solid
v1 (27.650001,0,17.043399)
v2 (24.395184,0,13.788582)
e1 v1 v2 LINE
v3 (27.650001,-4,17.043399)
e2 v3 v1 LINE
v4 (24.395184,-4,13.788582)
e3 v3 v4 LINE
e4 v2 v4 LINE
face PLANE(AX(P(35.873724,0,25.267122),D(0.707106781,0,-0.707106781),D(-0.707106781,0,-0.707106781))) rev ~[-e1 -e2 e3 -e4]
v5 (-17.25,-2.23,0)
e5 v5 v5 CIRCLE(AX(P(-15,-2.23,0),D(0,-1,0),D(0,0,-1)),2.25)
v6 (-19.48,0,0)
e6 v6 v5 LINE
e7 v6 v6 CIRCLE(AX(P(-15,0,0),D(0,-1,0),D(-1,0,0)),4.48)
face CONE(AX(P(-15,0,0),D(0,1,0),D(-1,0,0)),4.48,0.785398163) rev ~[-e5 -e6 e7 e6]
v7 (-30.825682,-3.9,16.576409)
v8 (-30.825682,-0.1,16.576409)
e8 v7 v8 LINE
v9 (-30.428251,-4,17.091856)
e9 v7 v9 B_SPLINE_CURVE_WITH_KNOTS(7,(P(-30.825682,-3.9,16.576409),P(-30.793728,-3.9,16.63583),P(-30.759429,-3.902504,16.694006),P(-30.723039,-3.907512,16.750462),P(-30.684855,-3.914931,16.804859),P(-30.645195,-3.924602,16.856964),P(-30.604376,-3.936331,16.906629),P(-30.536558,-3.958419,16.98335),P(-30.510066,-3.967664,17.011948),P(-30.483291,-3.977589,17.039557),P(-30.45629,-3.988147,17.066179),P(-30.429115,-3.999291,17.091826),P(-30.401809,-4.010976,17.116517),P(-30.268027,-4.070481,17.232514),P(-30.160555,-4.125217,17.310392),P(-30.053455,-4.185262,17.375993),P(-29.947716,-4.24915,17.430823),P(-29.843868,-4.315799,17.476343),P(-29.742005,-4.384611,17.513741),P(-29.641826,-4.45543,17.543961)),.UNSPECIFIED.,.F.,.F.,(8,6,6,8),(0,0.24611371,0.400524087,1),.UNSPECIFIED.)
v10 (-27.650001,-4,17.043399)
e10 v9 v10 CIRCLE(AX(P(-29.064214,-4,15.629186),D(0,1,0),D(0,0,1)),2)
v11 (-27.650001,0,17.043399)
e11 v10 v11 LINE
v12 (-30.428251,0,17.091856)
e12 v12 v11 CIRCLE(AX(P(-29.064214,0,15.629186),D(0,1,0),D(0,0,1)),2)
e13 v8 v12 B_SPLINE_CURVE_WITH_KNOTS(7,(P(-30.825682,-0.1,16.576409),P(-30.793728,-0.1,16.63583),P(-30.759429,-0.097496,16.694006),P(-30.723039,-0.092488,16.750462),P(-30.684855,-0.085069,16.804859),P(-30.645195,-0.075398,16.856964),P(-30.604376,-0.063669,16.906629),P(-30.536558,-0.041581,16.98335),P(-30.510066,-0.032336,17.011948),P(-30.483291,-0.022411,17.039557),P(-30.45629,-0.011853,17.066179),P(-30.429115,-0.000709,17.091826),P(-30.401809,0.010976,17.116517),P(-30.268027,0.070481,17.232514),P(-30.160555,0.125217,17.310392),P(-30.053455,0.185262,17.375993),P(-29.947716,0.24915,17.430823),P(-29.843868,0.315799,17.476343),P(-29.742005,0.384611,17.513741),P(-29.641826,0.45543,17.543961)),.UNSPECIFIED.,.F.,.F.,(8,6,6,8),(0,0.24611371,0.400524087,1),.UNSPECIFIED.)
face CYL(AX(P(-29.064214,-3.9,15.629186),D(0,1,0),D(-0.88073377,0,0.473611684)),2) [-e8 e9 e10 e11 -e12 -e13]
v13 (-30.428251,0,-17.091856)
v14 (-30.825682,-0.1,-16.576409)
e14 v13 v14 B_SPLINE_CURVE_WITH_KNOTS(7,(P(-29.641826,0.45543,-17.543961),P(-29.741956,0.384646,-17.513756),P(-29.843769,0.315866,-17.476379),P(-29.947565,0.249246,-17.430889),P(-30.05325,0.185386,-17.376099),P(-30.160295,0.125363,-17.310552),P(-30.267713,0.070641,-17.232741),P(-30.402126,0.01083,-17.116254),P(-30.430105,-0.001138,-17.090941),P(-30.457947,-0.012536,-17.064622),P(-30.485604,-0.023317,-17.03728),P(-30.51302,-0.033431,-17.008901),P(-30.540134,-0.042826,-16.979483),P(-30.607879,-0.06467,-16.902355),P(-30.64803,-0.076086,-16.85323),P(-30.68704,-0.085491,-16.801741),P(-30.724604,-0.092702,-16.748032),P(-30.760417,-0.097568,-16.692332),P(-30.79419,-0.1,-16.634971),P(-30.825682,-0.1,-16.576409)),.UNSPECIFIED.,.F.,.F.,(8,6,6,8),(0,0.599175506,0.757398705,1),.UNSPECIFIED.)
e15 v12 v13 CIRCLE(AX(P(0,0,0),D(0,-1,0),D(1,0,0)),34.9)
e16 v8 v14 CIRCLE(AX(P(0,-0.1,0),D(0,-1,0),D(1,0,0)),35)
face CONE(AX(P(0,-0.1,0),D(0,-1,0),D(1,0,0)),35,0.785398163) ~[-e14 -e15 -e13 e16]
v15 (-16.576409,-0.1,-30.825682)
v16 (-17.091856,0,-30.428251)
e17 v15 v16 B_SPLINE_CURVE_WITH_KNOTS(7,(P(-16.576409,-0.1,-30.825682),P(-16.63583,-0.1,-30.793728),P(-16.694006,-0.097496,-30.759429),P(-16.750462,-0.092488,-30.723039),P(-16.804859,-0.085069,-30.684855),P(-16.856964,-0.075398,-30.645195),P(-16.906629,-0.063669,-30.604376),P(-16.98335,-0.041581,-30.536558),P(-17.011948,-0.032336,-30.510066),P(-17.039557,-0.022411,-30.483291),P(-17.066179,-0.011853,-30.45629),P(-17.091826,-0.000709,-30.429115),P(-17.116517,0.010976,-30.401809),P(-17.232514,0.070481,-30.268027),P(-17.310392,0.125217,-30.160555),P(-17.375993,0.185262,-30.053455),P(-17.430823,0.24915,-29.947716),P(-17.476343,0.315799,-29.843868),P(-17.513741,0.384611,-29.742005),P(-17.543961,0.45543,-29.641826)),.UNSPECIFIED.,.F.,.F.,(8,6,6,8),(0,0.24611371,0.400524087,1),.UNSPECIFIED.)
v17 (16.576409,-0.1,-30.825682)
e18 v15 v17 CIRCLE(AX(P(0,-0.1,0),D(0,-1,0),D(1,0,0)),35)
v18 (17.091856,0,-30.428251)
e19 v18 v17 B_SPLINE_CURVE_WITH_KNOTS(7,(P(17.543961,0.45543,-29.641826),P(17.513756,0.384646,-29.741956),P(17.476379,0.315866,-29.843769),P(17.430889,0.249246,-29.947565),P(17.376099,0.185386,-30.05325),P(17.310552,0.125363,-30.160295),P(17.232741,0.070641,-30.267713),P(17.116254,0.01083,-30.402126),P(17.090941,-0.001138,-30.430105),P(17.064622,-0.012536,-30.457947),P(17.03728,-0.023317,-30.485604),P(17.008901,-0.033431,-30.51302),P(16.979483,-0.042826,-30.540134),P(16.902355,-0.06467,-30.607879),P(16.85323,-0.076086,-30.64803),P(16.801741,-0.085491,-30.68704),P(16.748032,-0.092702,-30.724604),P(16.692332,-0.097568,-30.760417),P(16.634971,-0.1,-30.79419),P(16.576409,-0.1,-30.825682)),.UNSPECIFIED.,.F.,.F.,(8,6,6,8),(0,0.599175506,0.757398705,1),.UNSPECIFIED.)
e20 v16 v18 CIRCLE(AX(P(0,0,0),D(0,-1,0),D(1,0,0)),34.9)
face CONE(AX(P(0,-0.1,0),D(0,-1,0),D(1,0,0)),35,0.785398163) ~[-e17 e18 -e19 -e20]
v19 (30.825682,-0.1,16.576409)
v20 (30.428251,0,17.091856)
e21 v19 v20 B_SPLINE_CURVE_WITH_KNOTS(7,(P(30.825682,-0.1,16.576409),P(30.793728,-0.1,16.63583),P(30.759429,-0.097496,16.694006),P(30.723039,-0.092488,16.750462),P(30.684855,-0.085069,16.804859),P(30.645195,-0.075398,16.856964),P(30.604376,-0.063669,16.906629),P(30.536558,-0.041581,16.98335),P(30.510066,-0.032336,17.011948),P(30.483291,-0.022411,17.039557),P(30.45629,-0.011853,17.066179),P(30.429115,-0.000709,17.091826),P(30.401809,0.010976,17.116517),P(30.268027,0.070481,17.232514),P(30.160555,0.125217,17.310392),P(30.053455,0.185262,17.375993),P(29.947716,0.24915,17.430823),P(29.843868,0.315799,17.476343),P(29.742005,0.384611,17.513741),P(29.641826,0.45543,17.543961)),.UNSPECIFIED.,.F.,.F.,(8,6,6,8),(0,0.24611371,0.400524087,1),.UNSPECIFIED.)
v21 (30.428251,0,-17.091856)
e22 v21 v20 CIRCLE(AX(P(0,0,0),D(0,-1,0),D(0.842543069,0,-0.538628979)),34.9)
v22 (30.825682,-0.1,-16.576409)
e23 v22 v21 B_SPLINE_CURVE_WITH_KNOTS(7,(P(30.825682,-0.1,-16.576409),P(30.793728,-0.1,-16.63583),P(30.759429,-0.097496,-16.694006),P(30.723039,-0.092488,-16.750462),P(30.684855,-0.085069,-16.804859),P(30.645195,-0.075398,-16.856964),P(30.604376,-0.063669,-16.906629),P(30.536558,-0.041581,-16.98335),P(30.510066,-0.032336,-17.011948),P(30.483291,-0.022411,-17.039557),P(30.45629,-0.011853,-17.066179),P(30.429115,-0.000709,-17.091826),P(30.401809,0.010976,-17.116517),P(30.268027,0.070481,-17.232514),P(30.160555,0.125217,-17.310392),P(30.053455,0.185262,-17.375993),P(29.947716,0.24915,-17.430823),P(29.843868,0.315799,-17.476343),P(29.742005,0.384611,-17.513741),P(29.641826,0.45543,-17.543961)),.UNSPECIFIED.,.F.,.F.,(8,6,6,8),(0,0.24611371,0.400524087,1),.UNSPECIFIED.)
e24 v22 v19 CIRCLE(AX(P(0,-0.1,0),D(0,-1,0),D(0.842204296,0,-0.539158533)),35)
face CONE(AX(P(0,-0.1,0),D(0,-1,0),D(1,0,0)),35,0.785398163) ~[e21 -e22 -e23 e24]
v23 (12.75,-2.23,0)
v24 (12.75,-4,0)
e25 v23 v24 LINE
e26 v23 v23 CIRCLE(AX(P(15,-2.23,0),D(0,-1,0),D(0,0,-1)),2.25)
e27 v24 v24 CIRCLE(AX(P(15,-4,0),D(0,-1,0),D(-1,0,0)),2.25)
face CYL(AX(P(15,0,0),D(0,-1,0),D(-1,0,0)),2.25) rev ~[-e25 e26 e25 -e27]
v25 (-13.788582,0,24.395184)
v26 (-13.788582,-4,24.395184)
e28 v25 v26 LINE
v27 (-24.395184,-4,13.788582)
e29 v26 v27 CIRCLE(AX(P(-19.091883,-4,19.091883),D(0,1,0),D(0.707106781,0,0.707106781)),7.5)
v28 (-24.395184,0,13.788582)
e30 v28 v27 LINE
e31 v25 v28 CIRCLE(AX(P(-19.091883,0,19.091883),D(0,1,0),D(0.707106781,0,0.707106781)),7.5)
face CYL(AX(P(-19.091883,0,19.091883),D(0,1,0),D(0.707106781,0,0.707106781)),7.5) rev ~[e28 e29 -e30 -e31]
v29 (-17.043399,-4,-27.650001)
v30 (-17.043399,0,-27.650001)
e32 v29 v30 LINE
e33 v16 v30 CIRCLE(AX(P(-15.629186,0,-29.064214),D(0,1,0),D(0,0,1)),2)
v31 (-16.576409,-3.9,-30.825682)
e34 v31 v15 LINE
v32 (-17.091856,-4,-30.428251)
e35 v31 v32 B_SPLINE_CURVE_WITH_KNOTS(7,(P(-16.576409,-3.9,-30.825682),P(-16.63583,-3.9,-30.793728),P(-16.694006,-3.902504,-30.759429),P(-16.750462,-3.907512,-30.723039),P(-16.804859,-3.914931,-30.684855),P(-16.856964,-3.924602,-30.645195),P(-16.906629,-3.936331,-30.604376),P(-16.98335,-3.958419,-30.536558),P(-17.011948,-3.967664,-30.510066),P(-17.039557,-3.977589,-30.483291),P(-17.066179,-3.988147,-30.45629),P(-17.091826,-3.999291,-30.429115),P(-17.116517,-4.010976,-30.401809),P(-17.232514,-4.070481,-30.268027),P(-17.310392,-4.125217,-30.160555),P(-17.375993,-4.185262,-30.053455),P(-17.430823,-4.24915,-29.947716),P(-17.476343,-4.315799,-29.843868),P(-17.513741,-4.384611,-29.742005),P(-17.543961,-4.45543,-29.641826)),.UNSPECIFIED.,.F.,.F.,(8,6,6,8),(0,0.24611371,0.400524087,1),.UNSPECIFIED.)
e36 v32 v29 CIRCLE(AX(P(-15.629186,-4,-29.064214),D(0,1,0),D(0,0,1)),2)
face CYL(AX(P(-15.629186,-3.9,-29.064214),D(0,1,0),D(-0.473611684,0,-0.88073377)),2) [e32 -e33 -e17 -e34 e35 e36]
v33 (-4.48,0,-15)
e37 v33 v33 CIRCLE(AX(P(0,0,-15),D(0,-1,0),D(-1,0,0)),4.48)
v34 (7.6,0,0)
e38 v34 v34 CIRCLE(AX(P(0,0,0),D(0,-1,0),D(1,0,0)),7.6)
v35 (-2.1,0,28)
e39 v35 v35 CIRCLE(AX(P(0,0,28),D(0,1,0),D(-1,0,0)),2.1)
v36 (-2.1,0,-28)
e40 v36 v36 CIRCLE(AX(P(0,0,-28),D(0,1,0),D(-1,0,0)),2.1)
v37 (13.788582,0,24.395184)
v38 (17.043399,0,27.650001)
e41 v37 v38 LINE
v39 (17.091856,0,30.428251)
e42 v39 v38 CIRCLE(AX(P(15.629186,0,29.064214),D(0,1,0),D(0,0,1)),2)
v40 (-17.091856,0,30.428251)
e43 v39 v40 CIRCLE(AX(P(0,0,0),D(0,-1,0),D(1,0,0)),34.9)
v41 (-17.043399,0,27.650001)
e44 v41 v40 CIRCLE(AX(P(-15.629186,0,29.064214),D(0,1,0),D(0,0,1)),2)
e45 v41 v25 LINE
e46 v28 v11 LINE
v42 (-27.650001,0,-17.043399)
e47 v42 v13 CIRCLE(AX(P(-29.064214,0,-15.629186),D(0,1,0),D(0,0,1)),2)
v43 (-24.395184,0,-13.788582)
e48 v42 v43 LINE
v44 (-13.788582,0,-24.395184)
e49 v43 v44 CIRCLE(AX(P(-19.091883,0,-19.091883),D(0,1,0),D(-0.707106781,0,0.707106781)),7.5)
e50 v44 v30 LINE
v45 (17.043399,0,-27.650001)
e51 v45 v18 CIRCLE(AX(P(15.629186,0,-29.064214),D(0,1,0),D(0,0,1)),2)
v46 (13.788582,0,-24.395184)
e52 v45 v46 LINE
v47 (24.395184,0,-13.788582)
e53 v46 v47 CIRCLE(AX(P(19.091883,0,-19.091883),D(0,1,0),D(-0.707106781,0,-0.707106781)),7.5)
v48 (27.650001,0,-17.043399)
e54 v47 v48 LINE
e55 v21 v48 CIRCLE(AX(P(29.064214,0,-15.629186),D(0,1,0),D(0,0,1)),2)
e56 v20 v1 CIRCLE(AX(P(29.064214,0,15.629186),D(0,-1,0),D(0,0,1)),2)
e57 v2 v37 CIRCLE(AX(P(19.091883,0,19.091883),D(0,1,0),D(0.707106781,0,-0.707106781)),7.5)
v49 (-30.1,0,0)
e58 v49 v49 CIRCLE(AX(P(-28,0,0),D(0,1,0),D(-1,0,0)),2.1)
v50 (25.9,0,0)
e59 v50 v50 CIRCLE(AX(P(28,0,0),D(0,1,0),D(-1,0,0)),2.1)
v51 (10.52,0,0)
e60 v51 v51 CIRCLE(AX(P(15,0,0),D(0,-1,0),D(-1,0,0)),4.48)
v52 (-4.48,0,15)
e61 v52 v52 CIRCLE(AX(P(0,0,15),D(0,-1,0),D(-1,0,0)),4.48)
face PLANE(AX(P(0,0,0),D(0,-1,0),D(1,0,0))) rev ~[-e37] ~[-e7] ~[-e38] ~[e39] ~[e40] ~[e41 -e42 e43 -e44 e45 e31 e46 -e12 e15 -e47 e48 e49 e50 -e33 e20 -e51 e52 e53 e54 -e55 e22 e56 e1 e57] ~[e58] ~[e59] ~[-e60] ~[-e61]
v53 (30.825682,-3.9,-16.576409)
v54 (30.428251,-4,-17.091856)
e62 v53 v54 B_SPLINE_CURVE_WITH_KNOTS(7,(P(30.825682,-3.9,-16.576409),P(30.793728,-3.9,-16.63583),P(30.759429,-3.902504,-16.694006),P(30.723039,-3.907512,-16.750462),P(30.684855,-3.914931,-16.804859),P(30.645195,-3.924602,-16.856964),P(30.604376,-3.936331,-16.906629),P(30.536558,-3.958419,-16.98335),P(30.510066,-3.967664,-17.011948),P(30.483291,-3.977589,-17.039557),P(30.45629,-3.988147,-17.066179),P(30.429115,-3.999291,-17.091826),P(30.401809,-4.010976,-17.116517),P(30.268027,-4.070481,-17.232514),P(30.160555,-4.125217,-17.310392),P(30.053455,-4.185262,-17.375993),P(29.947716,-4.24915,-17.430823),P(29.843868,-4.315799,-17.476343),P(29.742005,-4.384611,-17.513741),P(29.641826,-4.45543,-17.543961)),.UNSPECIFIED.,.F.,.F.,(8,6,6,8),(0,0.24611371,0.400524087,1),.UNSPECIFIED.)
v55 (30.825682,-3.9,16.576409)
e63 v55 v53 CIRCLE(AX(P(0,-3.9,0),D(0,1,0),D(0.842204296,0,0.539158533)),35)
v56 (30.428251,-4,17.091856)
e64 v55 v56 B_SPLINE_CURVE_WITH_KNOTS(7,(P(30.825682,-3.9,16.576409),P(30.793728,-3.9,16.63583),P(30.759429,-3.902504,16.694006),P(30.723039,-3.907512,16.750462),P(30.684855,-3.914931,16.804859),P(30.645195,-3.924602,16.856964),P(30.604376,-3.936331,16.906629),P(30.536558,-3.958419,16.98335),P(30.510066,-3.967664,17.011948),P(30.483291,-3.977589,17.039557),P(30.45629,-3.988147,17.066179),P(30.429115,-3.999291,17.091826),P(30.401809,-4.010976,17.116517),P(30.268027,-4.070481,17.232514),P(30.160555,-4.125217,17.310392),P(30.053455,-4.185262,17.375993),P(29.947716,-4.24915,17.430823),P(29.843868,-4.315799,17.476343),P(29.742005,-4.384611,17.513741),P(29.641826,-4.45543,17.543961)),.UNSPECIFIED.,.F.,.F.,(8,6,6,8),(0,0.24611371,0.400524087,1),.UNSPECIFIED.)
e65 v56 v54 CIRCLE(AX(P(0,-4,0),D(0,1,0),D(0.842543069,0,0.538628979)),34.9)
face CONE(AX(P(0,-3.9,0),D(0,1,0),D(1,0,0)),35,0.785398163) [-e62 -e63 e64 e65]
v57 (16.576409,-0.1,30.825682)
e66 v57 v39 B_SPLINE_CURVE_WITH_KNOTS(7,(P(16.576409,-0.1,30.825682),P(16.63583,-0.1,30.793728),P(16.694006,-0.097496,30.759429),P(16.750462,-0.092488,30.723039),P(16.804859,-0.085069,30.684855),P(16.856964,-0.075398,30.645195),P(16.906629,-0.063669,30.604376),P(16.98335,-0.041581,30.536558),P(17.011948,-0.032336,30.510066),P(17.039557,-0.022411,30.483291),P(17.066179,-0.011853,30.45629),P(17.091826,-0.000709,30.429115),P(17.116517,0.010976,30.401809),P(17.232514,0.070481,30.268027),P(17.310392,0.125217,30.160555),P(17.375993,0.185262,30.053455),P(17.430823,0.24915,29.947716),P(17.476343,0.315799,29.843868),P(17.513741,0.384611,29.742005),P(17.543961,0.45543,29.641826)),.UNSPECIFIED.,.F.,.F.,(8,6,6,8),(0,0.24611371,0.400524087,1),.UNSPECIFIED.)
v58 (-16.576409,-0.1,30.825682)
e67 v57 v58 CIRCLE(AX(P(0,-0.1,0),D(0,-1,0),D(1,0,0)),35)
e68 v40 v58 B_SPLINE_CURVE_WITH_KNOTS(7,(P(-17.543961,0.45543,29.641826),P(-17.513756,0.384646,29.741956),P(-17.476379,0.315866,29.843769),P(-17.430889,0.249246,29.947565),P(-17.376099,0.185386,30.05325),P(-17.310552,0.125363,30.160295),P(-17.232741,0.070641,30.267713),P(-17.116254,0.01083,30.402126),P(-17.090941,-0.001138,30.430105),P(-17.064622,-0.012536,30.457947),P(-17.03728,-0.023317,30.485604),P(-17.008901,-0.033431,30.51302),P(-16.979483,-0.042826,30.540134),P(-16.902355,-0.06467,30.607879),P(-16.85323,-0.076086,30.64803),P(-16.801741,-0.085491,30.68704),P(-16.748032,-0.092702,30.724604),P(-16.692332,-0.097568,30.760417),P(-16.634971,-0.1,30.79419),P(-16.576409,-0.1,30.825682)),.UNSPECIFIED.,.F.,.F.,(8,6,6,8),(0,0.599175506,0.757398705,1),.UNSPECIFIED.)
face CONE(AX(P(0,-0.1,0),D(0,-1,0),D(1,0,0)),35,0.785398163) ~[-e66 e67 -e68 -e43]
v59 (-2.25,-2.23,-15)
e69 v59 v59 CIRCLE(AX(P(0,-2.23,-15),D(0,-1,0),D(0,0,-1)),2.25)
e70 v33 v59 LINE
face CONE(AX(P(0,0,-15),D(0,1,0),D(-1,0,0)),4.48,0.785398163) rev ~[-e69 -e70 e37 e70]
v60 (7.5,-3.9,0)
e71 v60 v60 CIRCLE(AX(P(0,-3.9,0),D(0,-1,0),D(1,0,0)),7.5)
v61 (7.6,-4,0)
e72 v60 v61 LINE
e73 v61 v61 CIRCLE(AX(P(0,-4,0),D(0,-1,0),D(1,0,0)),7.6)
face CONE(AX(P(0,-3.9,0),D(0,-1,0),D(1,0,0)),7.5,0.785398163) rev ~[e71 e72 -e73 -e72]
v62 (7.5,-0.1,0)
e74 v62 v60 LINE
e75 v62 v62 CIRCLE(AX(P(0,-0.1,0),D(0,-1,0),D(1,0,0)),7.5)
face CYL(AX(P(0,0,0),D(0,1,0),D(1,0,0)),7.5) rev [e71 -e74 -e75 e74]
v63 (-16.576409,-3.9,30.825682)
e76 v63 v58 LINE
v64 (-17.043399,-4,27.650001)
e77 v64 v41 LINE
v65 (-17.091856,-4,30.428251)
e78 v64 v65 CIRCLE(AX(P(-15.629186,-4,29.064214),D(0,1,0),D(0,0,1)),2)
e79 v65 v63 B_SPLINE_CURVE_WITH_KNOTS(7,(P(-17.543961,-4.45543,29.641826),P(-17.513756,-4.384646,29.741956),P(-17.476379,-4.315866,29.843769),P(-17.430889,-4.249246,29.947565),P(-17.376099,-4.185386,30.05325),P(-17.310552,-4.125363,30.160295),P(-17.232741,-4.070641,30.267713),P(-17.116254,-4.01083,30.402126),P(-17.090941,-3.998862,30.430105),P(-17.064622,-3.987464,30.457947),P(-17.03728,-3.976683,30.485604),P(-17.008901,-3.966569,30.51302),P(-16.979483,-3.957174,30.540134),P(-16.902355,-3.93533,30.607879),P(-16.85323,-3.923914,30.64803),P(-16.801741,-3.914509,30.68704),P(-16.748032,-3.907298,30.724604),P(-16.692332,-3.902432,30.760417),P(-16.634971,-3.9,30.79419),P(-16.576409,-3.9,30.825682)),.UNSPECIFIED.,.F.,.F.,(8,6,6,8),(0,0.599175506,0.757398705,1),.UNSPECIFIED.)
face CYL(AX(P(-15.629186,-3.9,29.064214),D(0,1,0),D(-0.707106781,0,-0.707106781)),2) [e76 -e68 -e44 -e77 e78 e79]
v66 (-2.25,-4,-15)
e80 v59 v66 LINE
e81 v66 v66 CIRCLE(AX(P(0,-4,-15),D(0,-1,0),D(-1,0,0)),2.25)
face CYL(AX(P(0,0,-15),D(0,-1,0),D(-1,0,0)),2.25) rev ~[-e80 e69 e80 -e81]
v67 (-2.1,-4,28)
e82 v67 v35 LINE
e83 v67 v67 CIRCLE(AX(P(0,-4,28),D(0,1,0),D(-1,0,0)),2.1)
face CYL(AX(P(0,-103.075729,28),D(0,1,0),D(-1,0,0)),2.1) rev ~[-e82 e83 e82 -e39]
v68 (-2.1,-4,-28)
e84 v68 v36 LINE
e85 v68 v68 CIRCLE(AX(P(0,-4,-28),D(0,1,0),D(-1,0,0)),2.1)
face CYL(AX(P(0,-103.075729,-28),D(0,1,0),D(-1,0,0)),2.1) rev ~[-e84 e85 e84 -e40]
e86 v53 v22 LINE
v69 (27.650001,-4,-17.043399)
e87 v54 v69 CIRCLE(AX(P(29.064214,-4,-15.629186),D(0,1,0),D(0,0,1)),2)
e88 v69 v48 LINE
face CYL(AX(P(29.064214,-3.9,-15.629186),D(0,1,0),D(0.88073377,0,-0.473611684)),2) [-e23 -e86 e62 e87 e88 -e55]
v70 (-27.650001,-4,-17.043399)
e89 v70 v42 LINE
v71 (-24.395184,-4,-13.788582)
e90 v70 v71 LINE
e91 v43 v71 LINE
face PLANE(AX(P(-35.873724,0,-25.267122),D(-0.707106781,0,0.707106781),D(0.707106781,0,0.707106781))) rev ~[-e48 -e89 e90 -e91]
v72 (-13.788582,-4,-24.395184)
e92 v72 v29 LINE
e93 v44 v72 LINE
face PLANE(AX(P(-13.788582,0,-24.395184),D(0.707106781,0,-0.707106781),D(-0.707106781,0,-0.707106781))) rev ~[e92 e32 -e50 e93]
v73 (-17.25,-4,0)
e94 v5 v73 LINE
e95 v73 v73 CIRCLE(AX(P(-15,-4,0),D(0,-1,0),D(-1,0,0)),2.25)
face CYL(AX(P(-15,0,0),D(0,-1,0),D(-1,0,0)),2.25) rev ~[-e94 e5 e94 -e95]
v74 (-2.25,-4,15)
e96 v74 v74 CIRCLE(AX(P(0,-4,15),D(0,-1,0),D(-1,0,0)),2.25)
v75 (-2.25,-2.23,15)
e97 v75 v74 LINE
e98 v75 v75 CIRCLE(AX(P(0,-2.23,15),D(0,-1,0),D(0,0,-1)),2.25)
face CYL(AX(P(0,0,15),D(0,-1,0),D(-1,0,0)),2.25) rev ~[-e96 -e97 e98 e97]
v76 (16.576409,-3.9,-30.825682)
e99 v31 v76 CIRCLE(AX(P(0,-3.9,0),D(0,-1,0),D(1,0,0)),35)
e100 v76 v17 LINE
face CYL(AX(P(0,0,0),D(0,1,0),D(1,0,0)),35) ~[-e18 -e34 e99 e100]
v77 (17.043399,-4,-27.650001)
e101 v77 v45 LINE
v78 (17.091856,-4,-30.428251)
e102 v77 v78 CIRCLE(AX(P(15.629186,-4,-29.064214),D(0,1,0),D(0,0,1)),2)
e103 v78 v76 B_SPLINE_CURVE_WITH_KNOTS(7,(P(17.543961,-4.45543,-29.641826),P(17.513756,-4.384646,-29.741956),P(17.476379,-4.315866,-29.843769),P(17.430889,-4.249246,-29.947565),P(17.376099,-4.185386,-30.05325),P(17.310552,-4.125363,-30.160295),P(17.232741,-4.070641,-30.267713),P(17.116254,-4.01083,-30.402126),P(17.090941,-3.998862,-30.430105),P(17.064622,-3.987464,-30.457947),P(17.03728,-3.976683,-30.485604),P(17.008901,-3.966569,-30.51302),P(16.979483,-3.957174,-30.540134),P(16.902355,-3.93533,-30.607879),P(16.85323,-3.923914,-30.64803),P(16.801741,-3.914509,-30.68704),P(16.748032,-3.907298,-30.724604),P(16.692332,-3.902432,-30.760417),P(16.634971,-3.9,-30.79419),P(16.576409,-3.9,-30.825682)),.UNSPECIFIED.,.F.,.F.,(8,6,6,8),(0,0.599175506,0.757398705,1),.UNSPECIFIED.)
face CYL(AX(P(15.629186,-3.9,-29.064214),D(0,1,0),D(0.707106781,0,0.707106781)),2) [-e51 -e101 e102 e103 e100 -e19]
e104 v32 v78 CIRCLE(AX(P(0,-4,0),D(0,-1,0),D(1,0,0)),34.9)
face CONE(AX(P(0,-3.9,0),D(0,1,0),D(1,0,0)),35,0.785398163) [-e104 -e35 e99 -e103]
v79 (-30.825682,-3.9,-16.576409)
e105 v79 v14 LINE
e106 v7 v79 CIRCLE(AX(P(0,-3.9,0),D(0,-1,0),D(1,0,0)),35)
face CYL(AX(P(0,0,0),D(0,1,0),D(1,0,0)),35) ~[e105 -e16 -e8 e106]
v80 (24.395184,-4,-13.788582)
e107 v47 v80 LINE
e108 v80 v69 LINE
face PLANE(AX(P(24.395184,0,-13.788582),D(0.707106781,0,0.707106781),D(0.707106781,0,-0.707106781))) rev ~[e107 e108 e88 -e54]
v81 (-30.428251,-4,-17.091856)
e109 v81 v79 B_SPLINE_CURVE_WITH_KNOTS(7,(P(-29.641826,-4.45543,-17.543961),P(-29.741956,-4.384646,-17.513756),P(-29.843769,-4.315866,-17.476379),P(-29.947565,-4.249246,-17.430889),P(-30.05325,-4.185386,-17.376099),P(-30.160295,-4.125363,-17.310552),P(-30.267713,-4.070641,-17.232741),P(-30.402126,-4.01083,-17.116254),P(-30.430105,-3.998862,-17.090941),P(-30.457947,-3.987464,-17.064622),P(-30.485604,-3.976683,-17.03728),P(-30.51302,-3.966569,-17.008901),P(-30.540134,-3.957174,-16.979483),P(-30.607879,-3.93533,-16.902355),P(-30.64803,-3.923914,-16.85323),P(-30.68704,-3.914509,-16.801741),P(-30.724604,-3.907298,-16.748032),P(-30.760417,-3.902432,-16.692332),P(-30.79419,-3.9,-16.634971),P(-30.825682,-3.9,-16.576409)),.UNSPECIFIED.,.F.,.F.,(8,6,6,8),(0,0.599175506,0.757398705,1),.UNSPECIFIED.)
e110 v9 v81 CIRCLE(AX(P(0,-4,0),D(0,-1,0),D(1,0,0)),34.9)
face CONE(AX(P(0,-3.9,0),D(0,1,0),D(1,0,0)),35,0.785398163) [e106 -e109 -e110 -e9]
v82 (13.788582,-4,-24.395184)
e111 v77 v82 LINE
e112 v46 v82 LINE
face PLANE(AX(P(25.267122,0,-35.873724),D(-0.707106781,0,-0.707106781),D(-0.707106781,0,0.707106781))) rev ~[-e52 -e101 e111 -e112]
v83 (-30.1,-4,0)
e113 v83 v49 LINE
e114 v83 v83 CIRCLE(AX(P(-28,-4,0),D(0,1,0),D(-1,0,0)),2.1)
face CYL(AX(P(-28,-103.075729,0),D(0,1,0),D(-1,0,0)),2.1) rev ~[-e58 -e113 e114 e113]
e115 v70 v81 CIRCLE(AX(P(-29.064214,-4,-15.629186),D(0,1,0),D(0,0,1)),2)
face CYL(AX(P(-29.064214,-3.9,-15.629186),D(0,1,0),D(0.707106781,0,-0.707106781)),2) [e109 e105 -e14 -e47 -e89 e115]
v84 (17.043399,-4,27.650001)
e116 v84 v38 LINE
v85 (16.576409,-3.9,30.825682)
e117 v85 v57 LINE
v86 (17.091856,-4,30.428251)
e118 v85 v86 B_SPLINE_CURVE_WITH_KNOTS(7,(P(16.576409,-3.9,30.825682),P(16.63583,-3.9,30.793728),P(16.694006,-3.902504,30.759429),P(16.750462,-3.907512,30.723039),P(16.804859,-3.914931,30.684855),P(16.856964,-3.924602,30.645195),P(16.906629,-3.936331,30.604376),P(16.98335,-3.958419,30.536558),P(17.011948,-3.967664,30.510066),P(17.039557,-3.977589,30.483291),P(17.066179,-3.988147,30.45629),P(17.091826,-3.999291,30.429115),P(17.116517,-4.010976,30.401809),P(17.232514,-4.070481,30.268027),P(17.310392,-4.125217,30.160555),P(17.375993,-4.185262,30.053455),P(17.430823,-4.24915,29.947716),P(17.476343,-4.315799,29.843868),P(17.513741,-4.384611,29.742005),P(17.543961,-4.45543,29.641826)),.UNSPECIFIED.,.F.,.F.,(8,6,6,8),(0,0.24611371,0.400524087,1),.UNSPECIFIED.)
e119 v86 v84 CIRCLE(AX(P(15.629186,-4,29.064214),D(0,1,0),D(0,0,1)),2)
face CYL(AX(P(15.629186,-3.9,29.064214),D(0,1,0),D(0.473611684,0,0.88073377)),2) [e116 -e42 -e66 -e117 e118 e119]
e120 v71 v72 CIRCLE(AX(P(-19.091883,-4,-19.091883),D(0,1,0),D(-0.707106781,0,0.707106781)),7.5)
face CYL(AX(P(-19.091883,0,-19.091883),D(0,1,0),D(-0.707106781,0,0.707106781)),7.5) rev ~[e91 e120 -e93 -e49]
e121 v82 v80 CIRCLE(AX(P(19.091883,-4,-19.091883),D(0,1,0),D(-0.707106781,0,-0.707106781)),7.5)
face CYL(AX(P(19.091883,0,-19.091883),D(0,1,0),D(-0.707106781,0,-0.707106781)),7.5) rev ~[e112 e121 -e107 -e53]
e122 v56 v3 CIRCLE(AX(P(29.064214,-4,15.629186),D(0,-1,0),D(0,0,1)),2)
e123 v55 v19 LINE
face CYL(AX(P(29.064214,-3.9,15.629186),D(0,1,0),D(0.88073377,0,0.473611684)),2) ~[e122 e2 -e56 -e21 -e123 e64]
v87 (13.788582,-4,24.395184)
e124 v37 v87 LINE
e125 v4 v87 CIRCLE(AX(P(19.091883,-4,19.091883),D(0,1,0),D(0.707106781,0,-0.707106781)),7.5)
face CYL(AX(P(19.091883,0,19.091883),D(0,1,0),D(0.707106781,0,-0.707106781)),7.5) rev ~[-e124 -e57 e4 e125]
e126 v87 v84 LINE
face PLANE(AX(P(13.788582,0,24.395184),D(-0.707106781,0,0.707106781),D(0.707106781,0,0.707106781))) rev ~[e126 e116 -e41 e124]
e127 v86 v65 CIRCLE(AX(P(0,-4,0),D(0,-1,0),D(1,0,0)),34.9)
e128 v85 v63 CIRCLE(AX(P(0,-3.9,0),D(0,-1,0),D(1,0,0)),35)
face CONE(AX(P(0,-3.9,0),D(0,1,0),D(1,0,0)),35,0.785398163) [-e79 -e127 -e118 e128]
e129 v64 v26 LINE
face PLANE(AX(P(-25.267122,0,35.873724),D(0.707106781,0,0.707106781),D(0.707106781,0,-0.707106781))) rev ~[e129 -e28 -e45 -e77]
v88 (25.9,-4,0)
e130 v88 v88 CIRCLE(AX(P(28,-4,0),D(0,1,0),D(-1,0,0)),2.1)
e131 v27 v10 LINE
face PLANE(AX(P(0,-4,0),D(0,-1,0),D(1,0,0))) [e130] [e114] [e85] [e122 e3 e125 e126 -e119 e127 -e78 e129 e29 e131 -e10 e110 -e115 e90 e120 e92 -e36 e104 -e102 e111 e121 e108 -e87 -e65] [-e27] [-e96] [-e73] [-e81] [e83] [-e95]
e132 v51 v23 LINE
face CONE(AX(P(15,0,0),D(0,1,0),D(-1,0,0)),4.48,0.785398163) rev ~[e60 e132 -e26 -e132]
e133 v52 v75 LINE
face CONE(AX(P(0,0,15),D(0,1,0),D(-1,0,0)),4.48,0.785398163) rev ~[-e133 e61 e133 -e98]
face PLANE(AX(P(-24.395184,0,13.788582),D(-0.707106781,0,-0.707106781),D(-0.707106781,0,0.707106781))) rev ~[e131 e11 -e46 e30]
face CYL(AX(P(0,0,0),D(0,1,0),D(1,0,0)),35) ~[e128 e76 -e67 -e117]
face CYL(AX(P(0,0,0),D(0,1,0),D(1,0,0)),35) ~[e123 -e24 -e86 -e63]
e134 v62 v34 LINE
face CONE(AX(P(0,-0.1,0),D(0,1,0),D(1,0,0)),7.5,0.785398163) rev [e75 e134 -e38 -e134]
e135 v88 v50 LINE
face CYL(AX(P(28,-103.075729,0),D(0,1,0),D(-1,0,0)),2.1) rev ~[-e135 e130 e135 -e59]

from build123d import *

# Parameters (mm, degrees)
F0_R           = 35
F0_R_2         = 7.5
F1_DEPTH       = 4
F2_SIZE        = 0.1
F4_D           = 4.5
F4_CSINK_D     = 8.96
F4_CSINK_ANGLE = 90
F6_DEPTH       = 4
F7_R           = 2
F9_D           = 4.2


# Not quite as in the source:
# - a feature names something its author has since deleted; it is built from what else it names


with BuildPart() as f1:
    # F0 (on Front) → F1 (new body)
    with BuildSketch(Plane.XZ):
        Circle(F0_R)
        Circle(F0_R_2, mode=Mode.SUBTRACT)
    extrude(amount=F1_DEPTH)

    # F2
    f2_edges = [f1.edges().sort_by_distance(p)[0] for p in [
        (-35, -4, 0),
        (-35, 0, 0),
        (-7.5, 0, 0),
        (-7.5, -4, 0),
    ]]
    chamfer(f2_edges, length=F2_SIZE)

    # F4 (through all)
    with Locations(Plane(origin=(0, 0, 0), x_dir=(1, 0, 0), z_dir=(0, 1, 0))):
        with Locations((-15, 0), (0, 15), (15, 0), (0, -15)):
            CounterSinkHole(F4_D / 2, F4_CSINK_D / 2, counter_sink_angle=F4_CSINK_ANGLE)

    # F5 (on face) → F6 (cut, through all)
    with BuildSketch(Plane(origin=(0, 0, 0), x_dir=(-1, 0, 0), z_dir=(0, 1, 0))):
        with BuildLine():
            Line((-25.2671224679, -35.8737241857), (-13.7885822331, -24.3951839509))
            ThreePointArc((-13.7885822331, -24.3951839509), (-13.7885822331, -13.7885822331), (-24.3951839509, -13.7885822331))
            Line((-24.3951839509, -13.7885822331), (-35.8737241857, -25.2671224679))
            Line((-35.8737241857, -25.2671224679), (-25.2671224679, -35.8737241857))
        make_face()
        with BuildLine():
            Line((13.7885822331, -24.3951839509), (25.2671224679, -35.8737241857))
            Line((25.2671224679, -35.8737241857), (35.8737241857, -25.2671224679))
            Line((35.8737241857, -25.2671224679), (24.3951839509, -13.7885822331))
            ThreePointArc((24.3951839509, -13.7885822331), (13.7885822331, -13.7885822331), (13.7885822331, -24.3951839509))
        make_face()
        with BuildLine():
            Line((24.3951839509, 13.7885822331), (35.8737241857, 25.2671224679))
            Line((35.8737241857, 25.2671224679), (25.2671224679, 35.8737241857))
            Line((25.2671224679, 35.8737241857), (13.7885822331, 24.3951839509))
            ThreePointArc((13.7885822331, 24.3951839509), (13.7885822331, 13.7885822331), (24.3951839509, 13.7885822331))
        make_face()
        with BuildLine():
            Line((-13.7885822331, 24.3951839509), (-25.2671224679, 35.8737241857))
            Line((-25.2671224679, 35.8737241857), (-35.8737241857, 25.2671224679))
            Line((-35.8737241857, 25.2671224679), (-24.3951839509, 13.7885822331))
            ThreePointArc((-24.3951839509, 13.7885822331), (-13.7885822331, 13.7885822331), (-13.7885822331, 24.3951839509))
        make_face()
    extrude(amount=-F6_DEPTH, mode=Mode.SUBTRACT)

    # F7
    f7_edges = [f1.edges().sort_by_distance(p)[0] for p in [
        (29.47715, -2, -18.870549),
        (18.870549, -2, -29.47715),
        (-18.870549, -2, -29.47715),
        (-29.47715, -2, -18.870549),
        (-29.47715, -2, 18.870549),
        (-18.870549, -2, 29.47715),
        (18.870549, -2, 29.47715),
        (29.47715, -2, 18.870549),
    ]]
    fillet(f7_edges, radius=F7_R)

    # F9 (through all)
    with Locations(Plane.XZ.offset(4)):
        with Locations((0, 28), (28, 0), (0, -28), (-28, 0)):
            Hole(F9_D / 2)


solid = f1.part
